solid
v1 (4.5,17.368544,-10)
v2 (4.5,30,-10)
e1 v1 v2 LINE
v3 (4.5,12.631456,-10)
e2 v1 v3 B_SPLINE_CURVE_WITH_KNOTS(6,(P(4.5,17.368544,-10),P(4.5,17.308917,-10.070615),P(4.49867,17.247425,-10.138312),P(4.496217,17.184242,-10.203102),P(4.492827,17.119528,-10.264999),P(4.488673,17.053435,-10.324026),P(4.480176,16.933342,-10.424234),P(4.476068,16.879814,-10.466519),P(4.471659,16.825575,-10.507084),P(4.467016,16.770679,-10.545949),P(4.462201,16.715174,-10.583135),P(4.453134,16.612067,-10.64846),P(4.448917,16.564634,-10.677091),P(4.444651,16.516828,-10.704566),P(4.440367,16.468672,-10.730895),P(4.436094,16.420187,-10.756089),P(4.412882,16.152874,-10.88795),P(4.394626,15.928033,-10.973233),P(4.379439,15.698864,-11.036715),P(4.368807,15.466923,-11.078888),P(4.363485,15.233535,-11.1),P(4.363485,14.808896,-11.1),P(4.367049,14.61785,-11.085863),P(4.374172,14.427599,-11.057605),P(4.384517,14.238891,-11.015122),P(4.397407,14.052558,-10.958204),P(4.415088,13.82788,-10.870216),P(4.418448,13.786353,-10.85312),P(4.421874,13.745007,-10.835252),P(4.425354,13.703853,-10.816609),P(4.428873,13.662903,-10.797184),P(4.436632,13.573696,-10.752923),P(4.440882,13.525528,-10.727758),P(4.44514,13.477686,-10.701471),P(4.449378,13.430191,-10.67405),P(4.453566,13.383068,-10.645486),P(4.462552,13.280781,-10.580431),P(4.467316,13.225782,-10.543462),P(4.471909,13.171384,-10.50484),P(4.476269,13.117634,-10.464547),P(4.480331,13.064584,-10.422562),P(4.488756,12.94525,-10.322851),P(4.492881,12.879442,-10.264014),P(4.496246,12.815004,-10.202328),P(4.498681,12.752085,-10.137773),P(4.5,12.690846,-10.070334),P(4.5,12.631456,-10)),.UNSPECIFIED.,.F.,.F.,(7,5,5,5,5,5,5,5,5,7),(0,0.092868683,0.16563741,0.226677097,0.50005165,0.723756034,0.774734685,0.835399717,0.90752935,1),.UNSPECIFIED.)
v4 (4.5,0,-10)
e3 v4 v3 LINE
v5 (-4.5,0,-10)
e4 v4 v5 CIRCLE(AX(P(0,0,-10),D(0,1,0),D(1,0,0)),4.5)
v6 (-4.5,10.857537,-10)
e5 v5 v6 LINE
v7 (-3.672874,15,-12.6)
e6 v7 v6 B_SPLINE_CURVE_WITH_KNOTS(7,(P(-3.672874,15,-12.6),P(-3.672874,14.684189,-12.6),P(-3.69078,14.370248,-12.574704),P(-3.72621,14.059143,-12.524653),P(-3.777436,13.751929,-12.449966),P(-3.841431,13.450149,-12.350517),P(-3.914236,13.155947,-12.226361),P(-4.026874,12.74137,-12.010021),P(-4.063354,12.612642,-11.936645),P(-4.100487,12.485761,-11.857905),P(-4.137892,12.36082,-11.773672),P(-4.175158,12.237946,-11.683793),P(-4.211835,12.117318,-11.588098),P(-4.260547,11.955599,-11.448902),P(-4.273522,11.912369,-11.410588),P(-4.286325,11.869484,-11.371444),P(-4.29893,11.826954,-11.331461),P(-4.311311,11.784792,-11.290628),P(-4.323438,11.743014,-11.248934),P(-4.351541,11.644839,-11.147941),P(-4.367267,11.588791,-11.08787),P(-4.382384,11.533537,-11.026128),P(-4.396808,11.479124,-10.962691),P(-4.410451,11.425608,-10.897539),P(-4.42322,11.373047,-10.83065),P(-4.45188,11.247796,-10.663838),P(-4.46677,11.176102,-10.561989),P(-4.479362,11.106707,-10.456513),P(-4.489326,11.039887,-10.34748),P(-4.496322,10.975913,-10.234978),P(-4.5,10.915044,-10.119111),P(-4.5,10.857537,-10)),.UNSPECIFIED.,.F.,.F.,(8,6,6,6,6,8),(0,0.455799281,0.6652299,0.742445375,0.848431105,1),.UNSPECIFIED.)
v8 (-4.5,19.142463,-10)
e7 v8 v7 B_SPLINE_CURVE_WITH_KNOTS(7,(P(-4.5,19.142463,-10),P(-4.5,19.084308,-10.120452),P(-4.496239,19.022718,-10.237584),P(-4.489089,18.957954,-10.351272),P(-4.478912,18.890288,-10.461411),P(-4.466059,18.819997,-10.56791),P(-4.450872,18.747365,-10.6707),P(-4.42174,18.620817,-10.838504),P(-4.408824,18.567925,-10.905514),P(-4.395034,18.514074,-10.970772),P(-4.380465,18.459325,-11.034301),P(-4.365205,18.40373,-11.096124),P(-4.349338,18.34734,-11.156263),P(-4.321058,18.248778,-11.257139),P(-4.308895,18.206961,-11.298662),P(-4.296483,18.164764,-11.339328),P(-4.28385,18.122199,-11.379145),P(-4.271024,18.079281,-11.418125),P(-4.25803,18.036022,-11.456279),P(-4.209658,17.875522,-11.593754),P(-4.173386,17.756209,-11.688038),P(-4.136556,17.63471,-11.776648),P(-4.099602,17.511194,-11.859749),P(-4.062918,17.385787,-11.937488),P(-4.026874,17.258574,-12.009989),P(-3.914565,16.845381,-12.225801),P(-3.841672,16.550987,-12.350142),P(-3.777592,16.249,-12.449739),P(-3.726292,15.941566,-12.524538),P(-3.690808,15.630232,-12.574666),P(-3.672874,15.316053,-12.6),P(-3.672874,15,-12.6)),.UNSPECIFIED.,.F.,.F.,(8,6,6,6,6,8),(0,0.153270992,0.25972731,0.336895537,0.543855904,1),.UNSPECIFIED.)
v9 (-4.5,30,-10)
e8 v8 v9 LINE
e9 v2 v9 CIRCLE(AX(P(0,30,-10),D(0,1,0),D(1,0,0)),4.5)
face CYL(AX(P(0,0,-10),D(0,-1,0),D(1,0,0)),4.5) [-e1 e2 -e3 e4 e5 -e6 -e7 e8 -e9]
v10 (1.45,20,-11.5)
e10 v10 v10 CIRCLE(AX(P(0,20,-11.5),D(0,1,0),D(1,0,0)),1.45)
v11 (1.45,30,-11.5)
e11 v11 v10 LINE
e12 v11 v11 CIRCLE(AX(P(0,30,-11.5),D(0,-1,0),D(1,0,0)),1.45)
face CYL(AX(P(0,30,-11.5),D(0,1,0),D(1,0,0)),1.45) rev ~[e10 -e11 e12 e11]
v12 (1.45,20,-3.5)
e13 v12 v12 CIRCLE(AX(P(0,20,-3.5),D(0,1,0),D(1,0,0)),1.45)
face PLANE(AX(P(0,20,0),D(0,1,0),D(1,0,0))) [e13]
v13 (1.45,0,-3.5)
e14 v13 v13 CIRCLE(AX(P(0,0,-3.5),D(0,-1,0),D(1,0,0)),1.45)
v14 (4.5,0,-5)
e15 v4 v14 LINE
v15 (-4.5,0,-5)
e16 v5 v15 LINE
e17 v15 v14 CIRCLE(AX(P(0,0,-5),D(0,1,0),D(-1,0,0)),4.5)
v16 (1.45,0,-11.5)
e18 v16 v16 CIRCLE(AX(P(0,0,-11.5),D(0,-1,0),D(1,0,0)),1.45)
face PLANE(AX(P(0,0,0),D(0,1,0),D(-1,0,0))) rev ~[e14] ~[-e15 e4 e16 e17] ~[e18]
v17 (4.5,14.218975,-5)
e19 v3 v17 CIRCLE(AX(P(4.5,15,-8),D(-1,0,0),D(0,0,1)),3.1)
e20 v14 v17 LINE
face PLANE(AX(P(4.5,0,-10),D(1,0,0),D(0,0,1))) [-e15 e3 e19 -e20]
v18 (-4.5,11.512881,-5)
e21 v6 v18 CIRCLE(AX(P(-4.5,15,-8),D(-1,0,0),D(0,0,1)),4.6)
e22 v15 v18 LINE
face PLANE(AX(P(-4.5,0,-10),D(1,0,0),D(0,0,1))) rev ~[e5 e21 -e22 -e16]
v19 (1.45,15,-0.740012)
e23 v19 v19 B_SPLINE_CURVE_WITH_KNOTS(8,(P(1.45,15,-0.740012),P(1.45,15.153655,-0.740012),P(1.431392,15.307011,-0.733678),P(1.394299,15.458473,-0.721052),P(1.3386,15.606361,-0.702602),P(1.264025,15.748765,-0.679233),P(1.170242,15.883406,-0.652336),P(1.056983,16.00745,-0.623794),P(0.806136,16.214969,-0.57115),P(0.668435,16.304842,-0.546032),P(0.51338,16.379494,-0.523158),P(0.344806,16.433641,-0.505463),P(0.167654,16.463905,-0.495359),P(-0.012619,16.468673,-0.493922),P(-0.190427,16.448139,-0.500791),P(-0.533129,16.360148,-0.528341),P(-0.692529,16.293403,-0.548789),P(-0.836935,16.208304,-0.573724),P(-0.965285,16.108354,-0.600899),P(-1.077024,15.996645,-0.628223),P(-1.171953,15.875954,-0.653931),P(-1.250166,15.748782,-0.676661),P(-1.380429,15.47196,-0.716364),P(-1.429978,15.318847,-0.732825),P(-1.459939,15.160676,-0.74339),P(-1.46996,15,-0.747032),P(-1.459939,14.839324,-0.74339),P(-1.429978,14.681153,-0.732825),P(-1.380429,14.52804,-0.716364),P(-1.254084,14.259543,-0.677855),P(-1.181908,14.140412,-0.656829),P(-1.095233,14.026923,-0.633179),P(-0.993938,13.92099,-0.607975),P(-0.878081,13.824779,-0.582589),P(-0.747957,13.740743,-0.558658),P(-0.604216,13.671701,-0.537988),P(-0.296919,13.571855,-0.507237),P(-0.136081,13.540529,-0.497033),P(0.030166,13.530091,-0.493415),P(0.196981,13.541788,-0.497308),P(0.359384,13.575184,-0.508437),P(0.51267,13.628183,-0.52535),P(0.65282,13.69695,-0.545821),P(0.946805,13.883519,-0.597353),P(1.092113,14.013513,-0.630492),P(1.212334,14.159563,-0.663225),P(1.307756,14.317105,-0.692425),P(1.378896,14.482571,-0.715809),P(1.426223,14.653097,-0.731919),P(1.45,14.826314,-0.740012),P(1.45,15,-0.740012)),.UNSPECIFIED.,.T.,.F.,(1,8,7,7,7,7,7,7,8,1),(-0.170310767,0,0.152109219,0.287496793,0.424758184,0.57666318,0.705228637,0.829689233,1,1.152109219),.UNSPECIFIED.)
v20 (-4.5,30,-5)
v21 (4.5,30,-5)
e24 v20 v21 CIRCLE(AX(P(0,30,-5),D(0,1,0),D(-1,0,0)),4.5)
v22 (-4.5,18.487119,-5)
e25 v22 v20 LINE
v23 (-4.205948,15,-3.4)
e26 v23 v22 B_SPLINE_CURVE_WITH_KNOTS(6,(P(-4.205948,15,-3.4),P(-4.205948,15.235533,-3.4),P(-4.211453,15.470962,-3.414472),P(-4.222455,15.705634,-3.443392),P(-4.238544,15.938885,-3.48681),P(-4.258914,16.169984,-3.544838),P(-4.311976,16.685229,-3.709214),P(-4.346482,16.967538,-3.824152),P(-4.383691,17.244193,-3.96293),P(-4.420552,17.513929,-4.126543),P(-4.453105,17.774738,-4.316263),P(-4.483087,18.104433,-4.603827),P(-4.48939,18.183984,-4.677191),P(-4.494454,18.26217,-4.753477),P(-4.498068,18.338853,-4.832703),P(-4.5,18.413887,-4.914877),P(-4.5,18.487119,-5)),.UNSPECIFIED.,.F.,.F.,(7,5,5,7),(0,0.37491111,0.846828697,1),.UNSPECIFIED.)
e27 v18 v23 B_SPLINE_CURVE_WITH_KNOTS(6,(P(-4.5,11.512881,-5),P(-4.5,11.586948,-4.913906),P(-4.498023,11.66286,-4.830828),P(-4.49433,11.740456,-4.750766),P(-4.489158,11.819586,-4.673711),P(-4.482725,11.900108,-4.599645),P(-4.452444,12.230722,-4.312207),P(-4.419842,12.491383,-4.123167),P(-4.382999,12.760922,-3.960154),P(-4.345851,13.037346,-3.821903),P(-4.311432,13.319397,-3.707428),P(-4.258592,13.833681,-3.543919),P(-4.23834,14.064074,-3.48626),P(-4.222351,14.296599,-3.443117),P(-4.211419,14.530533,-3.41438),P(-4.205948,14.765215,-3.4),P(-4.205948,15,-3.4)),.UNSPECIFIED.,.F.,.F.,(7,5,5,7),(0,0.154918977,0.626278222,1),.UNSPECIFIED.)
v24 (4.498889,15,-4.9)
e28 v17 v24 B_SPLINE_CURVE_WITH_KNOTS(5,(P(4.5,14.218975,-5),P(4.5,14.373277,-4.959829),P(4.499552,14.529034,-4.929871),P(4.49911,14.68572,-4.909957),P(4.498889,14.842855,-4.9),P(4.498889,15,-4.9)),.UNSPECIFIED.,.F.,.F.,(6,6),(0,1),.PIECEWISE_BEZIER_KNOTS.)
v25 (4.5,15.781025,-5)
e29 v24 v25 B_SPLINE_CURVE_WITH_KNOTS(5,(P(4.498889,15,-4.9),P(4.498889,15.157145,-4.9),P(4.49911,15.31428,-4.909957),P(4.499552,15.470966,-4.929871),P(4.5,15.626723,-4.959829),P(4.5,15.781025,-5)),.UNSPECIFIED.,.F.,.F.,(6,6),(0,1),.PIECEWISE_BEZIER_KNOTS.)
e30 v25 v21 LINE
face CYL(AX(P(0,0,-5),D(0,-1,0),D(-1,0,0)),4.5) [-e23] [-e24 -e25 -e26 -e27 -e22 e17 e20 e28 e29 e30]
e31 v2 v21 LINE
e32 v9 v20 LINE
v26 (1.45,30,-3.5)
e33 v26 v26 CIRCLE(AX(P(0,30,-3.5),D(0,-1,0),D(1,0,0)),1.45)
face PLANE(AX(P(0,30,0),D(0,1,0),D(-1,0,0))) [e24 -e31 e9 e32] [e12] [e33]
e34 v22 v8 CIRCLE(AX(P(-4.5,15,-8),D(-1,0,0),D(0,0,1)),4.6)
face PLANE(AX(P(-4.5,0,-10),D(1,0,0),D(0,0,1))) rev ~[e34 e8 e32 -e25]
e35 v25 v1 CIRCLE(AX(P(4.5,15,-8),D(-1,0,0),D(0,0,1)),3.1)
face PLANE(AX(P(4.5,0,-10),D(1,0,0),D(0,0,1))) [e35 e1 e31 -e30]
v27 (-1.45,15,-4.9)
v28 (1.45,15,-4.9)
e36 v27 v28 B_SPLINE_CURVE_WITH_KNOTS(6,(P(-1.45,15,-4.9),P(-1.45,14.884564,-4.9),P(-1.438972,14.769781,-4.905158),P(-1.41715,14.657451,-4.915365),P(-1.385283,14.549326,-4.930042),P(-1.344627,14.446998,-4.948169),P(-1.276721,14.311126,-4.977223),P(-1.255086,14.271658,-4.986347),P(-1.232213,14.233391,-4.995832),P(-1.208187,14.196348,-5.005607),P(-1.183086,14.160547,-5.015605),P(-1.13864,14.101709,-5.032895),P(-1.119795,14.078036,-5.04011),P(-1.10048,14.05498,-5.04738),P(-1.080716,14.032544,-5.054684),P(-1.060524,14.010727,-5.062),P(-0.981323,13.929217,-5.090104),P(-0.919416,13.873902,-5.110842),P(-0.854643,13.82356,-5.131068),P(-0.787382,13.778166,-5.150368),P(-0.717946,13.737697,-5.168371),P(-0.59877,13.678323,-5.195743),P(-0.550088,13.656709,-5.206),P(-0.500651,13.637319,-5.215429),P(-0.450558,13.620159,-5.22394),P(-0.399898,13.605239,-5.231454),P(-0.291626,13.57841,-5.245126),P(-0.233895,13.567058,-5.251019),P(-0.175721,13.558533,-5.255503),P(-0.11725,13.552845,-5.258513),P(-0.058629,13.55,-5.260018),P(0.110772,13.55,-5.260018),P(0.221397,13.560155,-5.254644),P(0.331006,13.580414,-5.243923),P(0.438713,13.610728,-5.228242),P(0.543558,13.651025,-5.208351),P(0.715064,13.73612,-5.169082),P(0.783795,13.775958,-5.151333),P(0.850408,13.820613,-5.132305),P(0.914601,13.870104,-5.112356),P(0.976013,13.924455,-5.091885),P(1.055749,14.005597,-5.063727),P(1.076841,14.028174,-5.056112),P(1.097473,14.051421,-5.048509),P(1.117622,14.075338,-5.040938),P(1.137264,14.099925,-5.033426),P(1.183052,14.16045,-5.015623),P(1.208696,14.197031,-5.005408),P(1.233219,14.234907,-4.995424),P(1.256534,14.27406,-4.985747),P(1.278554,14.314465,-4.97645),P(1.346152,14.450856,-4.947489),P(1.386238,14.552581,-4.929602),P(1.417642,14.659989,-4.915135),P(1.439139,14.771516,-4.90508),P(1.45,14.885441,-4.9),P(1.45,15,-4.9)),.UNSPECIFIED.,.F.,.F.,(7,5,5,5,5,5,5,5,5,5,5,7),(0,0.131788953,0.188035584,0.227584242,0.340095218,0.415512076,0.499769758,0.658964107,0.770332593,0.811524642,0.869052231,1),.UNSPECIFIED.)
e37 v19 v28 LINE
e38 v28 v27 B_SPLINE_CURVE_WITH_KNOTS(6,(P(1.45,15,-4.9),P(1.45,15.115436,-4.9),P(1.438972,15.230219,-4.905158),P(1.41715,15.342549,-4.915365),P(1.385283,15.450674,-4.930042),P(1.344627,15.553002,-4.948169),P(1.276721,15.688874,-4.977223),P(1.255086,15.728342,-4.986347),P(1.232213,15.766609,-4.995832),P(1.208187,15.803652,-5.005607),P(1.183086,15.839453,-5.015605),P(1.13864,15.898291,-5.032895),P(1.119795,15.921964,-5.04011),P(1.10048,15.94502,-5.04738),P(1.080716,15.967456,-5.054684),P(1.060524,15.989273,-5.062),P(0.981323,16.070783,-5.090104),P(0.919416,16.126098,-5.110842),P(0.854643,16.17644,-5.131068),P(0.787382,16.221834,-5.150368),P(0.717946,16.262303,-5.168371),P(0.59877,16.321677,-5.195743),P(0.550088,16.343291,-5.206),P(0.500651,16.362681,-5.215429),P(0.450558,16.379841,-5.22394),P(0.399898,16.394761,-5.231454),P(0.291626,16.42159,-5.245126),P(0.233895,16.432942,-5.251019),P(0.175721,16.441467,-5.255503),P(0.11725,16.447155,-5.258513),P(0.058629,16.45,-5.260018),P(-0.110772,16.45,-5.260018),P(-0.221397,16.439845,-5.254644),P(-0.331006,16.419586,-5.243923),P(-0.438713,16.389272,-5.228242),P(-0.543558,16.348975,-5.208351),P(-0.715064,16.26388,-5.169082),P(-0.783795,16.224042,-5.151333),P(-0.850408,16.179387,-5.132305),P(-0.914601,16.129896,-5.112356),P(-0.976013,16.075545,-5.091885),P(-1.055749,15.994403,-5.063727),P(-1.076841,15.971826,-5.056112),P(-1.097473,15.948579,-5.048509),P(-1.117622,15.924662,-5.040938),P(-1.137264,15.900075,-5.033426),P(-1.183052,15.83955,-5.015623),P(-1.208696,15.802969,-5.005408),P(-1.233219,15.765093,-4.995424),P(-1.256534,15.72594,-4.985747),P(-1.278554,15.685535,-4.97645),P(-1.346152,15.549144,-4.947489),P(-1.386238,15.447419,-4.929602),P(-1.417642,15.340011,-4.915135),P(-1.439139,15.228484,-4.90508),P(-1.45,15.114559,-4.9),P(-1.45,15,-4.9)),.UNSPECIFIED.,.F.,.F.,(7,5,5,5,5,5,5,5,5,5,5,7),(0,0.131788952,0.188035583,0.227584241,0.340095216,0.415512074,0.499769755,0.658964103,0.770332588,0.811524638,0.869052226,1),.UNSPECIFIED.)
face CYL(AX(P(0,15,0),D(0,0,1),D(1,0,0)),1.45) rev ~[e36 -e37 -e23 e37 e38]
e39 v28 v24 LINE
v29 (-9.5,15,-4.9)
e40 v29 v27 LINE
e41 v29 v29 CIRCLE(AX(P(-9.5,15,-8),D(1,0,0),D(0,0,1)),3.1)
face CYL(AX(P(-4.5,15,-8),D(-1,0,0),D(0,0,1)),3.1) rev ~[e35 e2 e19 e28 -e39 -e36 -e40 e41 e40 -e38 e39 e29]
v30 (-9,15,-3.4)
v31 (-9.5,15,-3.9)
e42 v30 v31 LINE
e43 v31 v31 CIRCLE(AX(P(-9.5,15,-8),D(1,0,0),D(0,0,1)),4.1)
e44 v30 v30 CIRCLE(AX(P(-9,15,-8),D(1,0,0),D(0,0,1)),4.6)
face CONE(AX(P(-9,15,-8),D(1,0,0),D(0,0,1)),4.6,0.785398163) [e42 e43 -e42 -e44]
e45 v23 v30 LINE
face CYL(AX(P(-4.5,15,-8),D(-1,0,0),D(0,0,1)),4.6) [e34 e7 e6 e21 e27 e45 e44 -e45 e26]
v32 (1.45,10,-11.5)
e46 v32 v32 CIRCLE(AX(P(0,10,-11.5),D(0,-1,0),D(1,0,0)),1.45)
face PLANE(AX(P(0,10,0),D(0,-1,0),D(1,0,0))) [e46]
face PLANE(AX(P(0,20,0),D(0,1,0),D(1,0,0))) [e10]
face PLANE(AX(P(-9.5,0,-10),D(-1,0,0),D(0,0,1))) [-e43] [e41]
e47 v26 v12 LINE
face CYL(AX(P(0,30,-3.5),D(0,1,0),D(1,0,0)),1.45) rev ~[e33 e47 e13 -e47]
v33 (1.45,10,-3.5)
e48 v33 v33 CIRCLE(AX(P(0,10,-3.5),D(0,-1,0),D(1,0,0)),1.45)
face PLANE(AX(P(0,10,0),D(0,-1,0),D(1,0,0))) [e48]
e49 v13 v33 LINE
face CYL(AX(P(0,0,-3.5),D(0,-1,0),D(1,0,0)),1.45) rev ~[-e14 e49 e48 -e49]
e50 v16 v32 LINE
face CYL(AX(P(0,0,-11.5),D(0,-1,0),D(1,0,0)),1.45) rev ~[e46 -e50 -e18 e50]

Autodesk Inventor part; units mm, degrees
ref_plane "YZ Plane" through (0, 0, 0) normal (1, 0, 0) x (0, 1, 0)
ref_plane "XZ Plane" through (0, 0, 0) normal (0, 1, 0) x (-1, 0, 0)
sketch "Sketch2" plane through (0, 0, 0) normal (0, 1, 0) x (-1, 0, 0)
  line L0 (-4.5, -10) -> (-4.5, -5)
  line L1 (4.5, -10) -> (4.5, -5)
  arc A0 (4.5, -5) -> (-4.5, -5) centre (0, -5) ccw
  arc A1 (-4.5, -10) -> (4.5, -10) centre (0, -10) ccw
  point P0 (0, 0)
  point P1 (0.9888, -13.1808)
  dimension "d75" = 5
  dimension "d76" = 5
extrude "Extrusion1" add sketch "Sketch2" along normal blind 30
sketch "Sketch14" plane through (-4.5, 0, -10) normal (-1, 0, 0) x (0, 0, 1)
  line L0 (-4.5, 0) -> (-4.5, 30) projected
  line L1 (-4.5, 0) -> (-4.5, 15)
  line L2 (-4.5, 15) -> (2, 15)
  circle A0 centre (2, 15) radius 3.1
  circle A1 centre (2, 15) radius 4.6
  point P0 (10, 0)
  point P1 (-11.5, 30)
  dimension "d80" = 15
  dimension "d81" = 6.5
  dimension "d82" = 6.2
  dimension "d83" = 9.2
extrude "Extrusion13" add sketch "Sketch14" along normal blind 5 and the other way blind 5
chamfer "Chamfer4" distance 0.5 angle 45 1 edges at (-9.5, 15, -12.6)
sketch "Sketch15" plane through (-4.5, 15, -8) normal (-1, 0, 0) x (0, 0, 1)
  circle A0 centre (0, 0) radius 3.1 projected
  point P0 (8, -15)
extrude "Extrusion14" cut sketch "Sketch15" against normal through all
sketch "Sketch18" plane through (0, 30, 0) normal (0, 1, 0) x (1, 0, 0)
  arc A0 (4.5, 10) -> (-4.5, 10) centre (0, 10) ccw projected
  line L0 (0, 14.5) -> (0, 11.5)
  circle A1 centre (0, 11.5) radius 1.45
  arc A2 (-4.5, 5) -> (4.5, 5) centre (0, 5) ccw projected
  line L1 (0, 0.5) -> (0, 3.5)
  circle A3 centre (0, 3.5) radius 1.45
  point P0 (0, 0)
  dimension "d103" = 3
  dimension "d104" = 2.9
  dimension "d105" = 3
  dimension "d106" = 2.9
extrude "Extrusion17" cut sketch "Sketch18" against normal blind 10
sketch "Sketch19" plane through (0, 0, 0) normal (0, -1, 0) x (1, 0, 0)
  line L0 (4.5, -10) -> (4.5, -5) projected
  arc A0 (4.5, -5) -> (-4.5, -5) centre (0, -5) ccw projected
  line L1 (-4.5, -5) -> (-4.5, -10) projected
  arc A1 (-4.5, -10) -> (4.5, -10) centre (0, -10) ccw projected
  circle A2 centre (0, -11.5) radius 1.45 projected
  circle A3 centre (0, -3.5) radius 1.45 projected
extrude "Extrusion18" cut sketch "Sketch19" against normal blind 10 contours A2 | A3
ref_plane "Work Plane9" through (0, 0, -0.5) normal (0, 0, 1) x (1, 0, 0)
sketch "Sketch20" plane through (0, 0, 0) normal (0, 0, 1) x (1, 0, 0)
  circle A0 centre (0, 15) radius 1.45
  point P0 (0, 0)
  dimension "d115" = 2.9
extrude "Extrusion19" cut sketch "Sketch20" against normal up to next
thread "Thread1" size "M3x0.5" class "6H" standard "ANSI Metric M Profile" full length
properties part number "Front mount" material "ABS Plastic"
